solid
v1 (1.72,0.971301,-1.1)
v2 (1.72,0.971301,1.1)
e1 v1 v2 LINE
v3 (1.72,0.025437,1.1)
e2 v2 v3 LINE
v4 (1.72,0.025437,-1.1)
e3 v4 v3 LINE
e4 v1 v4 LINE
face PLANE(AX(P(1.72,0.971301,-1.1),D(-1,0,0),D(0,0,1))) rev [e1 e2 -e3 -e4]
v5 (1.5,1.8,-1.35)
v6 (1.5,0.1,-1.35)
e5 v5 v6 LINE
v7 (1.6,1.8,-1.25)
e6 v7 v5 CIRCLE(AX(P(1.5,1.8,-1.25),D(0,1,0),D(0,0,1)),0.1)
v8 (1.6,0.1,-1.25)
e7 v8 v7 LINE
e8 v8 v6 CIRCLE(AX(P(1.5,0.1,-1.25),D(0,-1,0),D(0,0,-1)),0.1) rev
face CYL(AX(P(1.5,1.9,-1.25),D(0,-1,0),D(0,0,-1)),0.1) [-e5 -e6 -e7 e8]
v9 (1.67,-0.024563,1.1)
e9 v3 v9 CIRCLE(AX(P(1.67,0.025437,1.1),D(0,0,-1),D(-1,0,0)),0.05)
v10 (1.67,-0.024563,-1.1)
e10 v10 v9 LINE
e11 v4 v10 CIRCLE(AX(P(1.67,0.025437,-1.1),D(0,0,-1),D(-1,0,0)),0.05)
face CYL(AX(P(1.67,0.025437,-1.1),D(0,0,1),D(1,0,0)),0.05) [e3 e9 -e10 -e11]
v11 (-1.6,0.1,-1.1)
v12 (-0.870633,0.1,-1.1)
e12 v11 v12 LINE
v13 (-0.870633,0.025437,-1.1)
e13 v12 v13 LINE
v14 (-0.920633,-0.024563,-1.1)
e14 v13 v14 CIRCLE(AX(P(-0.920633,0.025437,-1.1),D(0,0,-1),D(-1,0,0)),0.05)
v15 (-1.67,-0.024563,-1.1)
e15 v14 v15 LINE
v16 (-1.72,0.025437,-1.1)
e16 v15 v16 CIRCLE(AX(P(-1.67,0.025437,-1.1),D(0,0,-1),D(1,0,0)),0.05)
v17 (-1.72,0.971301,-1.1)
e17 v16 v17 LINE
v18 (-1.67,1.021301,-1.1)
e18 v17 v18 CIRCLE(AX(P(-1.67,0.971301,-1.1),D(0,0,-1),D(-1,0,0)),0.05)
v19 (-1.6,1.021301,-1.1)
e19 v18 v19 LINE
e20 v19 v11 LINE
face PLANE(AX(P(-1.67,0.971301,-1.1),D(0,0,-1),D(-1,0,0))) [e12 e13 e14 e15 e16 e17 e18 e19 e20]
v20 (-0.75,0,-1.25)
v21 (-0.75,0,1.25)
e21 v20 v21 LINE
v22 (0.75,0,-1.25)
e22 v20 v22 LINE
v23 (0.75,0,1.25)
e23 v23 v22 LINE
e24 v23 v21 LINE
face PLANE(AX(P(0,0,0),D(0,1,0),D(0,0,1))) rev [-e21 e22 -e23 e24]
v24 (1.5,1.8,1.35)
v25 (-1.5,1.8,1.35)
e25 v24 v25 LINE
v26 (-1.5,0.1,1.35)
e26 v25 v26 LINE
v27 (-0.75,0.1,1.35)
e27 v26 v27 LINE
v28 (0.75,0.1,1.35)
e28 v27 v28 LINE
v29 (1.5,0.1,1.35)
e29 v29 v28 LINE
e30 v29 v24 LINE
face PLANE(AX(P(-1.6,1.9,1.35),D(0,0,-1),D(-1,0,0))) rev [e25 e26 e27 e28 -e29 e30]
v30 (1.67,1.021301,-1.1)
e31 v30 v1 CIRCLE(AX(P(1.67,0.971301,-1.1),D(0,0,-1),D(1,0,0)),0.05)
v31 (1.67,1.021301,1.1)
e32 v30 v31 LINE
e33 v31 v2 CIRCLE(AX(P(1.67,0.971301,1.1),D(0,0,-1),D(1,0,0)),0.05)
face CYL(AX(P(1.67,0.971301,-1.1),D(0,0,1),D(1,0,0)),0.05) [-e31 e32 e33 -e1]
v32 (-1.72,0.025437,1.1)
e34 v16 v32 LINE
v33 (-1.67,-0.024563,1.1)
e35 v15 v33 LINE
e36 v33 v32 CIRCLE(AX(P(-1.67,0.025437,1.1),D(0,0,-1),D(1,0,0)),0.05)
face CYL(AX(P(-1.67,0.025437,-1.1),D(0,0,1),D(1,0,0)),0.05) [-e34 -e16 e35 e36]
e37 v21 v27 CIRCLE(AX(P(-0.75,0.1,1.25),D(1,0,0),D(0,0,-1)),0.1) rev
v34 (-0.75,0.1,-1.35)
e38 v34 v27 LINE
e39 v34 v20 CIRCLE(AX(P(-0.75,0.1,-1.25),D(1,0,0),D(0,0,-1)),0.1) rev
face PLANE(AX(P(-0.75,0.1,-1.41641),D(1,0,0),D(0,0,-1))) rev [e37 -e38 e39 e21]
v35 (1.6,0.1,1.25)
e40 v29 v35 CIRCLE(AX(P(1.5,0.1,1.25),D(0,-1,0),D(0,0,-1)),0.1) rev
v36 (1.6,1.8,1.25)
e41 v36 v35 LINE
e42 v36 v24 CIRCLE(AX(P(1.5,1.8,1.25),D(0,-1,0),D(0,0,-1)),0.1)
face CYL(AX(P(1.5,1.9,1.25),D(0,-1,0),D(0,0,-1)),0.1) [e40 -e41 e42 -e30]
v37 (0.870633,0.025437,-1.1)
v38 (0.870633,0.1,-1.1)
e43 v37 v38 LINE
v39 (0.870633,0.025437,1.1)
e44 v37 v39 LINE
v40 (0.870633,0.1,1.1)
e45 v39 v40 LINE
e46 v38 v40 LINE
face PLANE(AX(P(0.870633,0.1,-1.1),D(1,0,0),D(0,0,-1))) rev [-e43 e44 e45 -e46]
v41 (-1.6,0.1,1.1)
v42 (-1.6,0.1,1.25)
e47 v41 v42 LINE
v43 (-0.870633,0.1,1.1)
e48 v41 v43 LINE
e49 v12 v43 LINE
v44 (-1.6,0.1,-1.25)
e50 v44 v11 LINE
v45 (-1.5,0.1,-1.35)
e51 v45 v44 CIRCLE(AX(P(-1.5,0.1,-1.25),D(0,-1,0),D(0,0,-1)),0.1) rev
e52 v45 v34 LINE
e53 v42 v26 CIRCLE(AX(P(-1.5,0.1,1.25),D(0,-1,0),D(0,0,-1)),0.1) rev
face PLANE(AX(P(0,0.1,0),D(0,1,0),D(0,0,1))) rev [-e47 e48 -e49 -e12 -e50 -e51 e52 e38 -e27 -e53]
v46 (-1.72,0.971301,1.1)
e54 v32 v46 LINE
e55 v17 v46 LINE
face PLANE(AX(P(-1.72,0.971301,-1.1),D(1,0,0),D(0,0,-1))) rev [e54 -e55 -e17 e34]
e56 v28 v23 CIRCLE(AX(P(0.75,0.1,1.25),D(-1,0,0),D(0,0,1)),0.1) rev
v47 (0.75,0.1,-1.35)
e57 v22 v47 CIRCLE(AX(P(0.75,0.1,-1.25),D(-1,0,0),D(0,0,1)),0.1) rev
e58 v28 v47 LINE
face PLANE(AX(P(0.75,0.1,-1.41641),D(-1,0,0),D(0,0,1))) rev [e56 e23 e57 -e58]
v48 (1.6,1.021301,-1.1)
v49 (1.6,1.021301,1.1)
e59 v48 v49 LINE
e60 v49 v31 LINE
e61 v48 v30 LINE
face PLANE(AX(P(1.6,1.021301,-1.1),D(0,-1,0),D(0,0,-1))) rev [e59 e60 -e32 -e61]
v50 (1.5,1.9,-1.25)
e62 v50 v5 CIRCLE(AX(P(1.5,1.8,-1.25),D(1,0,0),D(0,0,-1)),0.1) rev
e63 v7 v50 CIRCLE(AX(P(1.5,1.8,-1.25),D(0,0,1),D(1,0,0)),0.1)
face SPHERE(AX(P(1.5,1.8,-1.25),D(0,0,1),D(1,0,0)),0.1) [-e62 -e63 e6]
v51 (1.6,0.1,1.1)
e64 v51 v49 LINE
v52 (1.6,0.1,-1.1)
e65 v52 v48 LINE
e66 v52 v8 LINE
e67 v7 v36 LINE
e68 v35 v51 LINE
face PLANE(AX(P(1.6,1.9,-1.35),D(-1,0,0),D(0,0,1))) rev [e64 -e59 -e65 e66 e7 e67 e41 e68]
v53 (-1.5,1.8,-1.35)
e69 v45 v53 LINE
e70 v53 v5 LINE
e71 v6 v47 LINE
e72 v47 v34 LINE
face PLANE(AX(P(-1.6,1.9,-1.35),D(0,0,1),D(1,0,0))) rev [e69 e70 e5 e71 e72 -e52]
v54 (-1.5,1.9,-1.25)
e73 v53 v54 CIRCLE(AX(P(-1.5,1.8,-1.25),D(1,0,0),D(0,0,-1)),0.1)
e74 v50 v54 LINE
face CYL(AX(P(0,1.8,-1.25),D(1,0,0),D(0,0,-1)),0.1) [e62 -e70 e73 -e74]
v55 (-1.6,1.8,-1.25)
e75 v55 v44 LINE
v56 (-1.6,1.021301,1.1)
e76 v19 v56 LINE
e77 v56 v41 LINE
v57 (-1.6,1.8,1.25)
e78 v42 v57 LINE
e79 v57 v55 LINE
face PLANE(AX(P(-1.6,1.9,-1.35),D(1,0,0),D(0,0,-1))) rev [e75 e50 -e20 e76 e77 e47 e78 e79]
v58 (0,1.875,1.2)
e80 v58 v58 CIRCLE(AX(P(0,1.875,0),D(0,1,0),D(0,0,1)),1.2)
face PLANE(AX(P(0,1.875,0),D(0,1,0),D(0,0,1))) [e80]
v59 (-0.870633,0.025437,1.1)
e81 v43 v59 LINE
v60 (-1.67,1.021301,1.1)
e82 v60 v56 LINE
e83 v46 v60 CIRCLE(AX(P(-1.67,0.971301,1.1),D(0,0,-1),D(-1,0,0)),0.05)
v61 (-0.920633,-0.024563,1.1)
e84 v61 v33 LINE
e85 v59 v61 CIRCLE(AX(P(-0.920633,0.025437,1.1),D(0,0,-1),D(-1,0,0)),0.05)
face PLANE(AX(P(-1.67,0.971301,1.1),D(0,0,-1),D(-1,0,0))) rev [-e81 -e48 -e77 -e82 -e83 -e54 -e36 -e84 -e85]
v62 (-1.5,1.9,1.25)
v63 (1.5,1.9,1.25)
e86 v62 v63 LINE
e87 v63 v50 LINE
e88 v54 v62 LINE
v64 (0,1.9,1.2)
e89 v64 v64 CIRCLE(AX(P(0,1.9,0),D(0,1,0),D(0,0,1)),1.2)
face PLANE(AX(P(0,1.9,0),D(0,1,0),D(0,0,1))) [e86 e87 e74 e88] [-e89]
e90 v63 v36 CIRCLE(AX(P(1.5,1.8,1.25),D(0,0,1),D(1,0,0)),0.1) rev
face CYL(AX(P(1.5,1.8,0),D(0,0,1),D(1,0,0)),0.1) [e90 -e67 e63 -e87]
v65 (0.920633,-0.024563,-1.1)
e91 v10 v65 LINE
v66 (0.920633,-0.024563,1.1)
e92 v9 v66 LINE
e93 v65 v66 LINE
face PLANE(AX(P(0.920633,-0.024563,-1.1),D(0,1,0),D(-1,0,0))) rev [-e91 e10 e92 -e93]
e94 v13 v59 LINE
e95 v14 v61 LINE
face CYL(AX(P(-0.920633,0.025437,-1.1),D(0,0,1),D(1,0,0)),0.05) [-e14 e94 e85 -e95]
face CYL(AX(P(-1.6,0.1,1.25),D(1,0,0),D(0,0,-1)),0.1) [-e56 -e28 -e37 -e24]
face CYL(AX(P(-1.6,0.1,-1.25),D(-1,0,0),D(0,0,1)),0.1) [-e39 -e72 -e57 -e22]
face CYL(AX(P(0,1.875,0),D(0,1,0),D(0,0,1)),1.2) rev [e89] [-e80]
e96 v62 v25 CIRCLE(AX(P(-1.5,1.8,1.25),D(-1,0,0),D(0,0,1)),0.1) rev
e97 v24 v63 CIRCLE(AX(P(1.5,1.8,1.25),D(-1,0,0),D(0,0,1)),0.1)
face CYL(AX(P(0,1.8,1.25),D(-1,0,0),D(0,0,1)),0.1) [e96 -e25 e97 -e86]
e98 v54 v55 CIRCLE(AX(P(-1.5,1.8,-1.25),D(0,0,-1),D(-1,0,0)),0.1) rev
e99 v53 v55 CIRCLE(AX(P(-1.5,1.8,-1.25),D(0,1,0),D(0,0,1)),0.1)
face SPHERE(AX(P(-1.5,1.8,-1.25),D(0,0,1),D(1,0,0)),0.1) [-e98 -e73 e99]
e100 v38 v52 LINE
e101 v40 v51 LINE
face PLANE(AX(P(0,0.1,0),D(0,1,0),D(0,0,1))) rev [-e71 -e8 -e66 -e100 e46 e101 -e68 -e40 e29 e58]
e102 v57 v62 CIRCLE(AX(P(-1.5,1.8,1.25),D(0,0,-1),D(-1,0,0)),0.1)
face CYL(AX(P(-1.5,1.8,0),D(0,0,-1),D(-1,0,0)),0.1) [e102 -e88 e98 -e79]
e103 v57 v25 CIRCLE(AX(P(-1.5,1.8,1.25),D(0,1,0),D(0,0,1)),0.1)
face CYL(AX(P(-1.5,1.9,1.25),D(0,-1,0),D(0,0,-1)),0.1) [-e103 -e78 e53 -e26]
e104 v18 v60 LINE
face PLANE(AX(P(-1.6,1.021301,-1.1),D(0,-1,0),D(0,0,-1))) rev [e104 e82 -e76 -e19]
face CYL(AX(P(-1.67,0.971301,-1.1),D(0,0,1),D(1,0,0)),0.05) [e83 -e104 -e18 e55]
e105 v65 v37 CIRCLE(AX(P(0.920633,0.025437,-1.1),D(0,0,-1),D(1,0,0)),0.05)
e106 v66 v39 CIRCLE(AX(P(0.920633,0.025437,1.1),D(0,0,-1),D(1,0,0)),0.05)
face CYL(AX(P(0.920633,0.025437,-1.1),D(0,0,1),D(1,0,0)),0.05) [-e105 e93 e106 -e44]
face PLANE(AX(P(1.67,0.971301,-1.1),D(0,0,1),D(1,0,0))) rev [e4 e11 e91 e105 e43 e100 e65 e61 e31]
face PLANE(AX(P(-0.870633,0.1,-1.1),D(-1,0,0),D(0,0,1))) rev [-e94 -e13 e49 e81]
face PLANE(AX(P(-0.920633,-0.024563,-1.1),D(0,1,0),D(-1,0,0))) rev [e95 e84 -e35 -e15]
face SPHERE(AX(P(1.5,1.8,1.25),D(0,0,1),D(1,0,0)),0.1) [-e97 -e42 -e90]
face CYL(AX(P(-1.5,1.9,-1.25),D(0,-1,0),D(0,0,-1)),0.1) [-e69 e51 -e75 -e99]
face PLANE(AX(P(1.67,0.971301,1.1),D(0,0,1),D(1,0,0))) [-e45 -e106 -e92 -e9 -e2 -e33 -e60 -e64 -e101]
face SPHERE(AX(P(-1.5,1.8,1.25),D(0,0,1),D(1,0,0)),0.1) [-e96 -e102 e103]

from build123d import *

# Parameters (mm, degrees)
SKETCH_2_W          = 3.2
SKETCH_2_H          = 2.7
EXTRUDE_1_DEPTH     = 1.9
FILLET_1_R          = 0.1
FILLET_2_R          = 0.1
FILLET_3_R          = 0.1
FILLET_4_R          = 0.1
FILLET_5_R          = 0.1
SKETCH_3_R          = 1.2
CUT_EXTRUDE_1_DEPTH = 0.025
SKETCH_4_W          = 0.92775498
SKETCH_4_H          = 2.835918068
CUT_EXTRUDE_2_DEPTH = 0.1
EXTRUDE_3_DEPTH     = 1.1


with BuildPart() as part:
    # Эскиз2 → Бобышка-Вытянуть1 (new body)
    with BuildSketch(Plane(origin=(0, 0, 0), x_dir=(1, 0, 0), z_dir=(0, 1, 0))):
        Rectangle(SKETCH_2_W, SKETCH_2_H)
    extrude(amount=EXTRUDE_1_DEPTH)

    # Скругление1
    fillet_1_edges = [part.edges().sort_by_distance(p)[0] for p in [
        (-1.6, 1.9, 0),
        (0, 1.9, 1.35),
        (1.6, 1.9, 0),
        (0, 1.9, -1.35),
    ]]
    fillet(fillet_1_edges, radius=FILLET_1_R)

    # Скругление2
    # the kernel refuses this fillet: 0.1 mm, written as the material it takes off along each edge
    with BuildSketch(Plane(origin=(-1.5, 1.8, 1.25), x_dir=(0, 0, 1), z_dir=(-1, 0, 0))) as fillet_2_piece_1_section:
        Polygon((0, 0), (FILLET_2_R, 0), (FILLET_2_R, FILLET_2_R), (0, FILLET_2_R), align=None)
    fillet_2_piece_1 = extrude(amount=FILLET_2_R, mode=Mode.PRIVATE)
    fillet_2_piece_1 = fillet_2_piece_1 - Plane(origin=(-1.5, 1.8, 1.25), x_dir=(0, -0.7071067811865475, -0.7071067811865475), z_dir=(-1, 0, 0)) * Sphere(FILLET_2_R, mode=Mode.PRIVATE)
    add(fillet_2_piece_1, mode=Mode.SUBTRACT)
    with BuildSketch(Plane(origin=(1.5, 1.8, 1.25), x_dir=(0, 0, 1), z_dir=(1, 0, 0))) as fillet_2_piece_2_section:
        Polygon((0, 0), (FILLET_2_R, 0), (FILLET_2_R, -FILLET_2_R), (0, -FILLET_2_R), align=None)
    fillet_2_piece_2 = extrude(amount=FILLET_2_R, mode=Mode.PRIVATE)
    fillet_2_piece_2 = fillet_2_piece_2 - Plane(origin=(1.5, 1.8, 1.25), x_dir=(0, -0.7071067811865475, -0.7071067811865475), z_dir=(1, 0, 0)) * Sphere(FILLET_2_R, mode=Mode.PRIVATE)
    add(fillet_2_piece_2, mode=Mode.SUBTRACT)
    with BuildSketch(Plane(origin=(1.6, -0.25, 1.35), x_dir=(0, 0, -1), z_dir=(0, 1, 0))) as fillet_2_piece_3:
        with BuildLine():
            CenterArc((FILLET_2_R, FILLET_2_R), FILLET_2_R, 180, 90)
            Line((0, FILLET_2_R), (0, 0))
            Line((0, 0), (FILLET_2_R, 0))
        make_face()
    extrude(amount=2.05, mode=Mode.SUBTRACT)
    with BuildSketch(Plane(origin=(-1.6, -0.25, 1.35), x_dir=(0, 0, -1), z_dir=(0, 1, 0))) as fillet_2_piece_4:
        with BuildLine():
            CenterArc((FILLET_2_R, -FILLET_2_R), FILLET_2_R, 90, 90)
            Line((0, -FILLET_2_R), (0, 0))
            Line((0, 0), (FILLET_2_R, 0))
        make_face()
    extrude(amount=2.05, mode=Mode.SUBTRACT)
    with BuildSketch(Plane(origin=(1.85, 0, 1.35), x_dir=(0, 0, -1), z_dir=(-1, 0, 0))) as fillet_2_piece_5:
        with BuildLine():
            CenterArc((FILLET_2_R, -FILLET_2_R), FILLET_2_R, 90, 90)
            Line((0, -FILLET_2_R), (0, 0))
            Line((0, 0), (FILLET_2_R, 0))
        make_face()
    extrude(amount=3.7, mode=Mode.SUBTRACT)

    # Скругление3
    # the kernel refuses this fillet: 0.1 mm, written as the material it takes off along each edge
    with BuildSketch(Plane(origin=(1.5, 1.8, -1.25), x_dir=(1, 0, 0), z_dir=(0, 0, -1))) as fillet_3_piece_1_section:
        Polygon((0, 0), (FILLET_3_R, 0), (FILLET_3_R, -FILLET_3_R), (0, -FILLET_3_R), align=None)
    fillet_3_piece_1 = extrude(amount=FILLET_3_R, mode=Mode.PRIVATE)
    fillet_3_piece_1 = fillet_3_piece_1 - Plane(origin=(1.5, 1.8, -1.25), x_dir=(-0.7071067811865475, -0.7071067811865475, 0), z_dir=(0, 0, -1)) * Sphere(FILLET_3_R, mode=Mode.PRIVATE)
    add(fillet_3_piece_1, mode=Mode.SUBTRACT)
    with BuildSketch(Plane(origin=(1.5, 0.1, 1.25), x_dir=(1, 0, 0), z_dir=(0, -1, 0))) as fillet_3_piece_2_section:
        Polygon((0, 0), (FILLET_3_R, 0), (FILLET_3_R, FILLET_3_R), (0, FILLET_3_R), align=None)
    fillet_3_piece_2 = extrude(amount=FILLET_3_R, mode=Mode.PRIVATE)
    fillet_3_piece_2 = fillet_3_piece_2 - Plane(origin=(1.5, 0.1, 1.25), x_dir=(-0.7071067811865476, 0, -0.7071067811865475), z_dir=(0, -1, 0)) * Sphere(FILLET_3_R, mode=Mode.PRIVATE)
    add(fillet_3_piece_2, mode=Mode.SUBTRACT)
    with BuildSketch(Plane(origin=(1.6, -0.25, -1.35), x_dir=(-1, 0, 0), z_dir=(0, 1, 0))) as fillet_3_piece_3:
        with BuildLine():
            CenterArc((FILLET_3_R, FILLET_3_R), FILLET_3_R, 180, 90)
            Line((0, FILLET_3_R), (0, 0))
            Line((0, 0), (FILLET_3_R, 0))
        make_face()
    extrude(amount=2.05, mode=Mode.SUBTRACT)
    with BuildSketch(Plane(origin=(1.6, 0, -1.6), x_dir=(-1, 0, 0), z_dir=(0, 0, 1))) as fillet_3_piece_4:
        with BuildLine():
            CenterArc((FILLET_3_R, -FILLET_3_R), FILLET_3_R, 90, 90)
            Line((0, -FILLET_3_R), (0, 0))
            Line((0, 0), (FILLET_3_R, 0))
        make_face()
    extrude(amount=2.85, mode=Mode.SUBTRACT)

    # Скругление4
    # the kernel refuses this fillet: 0.1 mm, written as the material it takes off along each edge
    with BuildSketch(Plane(origin=(-1.5, 1.8, -1.25), x_dir=(-1, 0, 0), z_dir=(0, 0, -1))) as fillet_4_piece_1_section:
        Polygon((0, 0), (FILLET_4_R, 0), (FILLET_4_R, FILLET_4_R), (0, FILLET_4_R), align=None)
    fillet_4_piece_1 = extrude(amount=FILLET_4_R, mode=Mode.PRIVATE)
    fillet_4_piece_1 = fillet_4_piece_1 - Plane(origin=(-1.5, 1.8, -1.25), x_dir=(0.7071067811865475, -0.7071067811865475, 0), z_dir=(0, 0, -1)) * Sphere(FILLET_4_R, mode=Mode.PRIVATE)
    add(fillet_4_piece_1, mode=Mode.SUBTRACT)
    with BuildSketch(Plane(origin=(1.5, 0.1, -1.25), x_dir=(0, -1, 0), z_dir=(0, 0, -1))) as fillet_4_piece_2_section:
        Polygon((0, 0), (FILLET_4_R, 0), (FILLET_4_R, -FILLET_4_R), (0, -FILLET_4_R), align=None)
    fillet_4_piece_2 = extrude(amount=FILLET_4_R, mode=Mode.PRIVATE)
    fillet_4_piece_2 = fillet_4_piece_2 - Plane(origin=(1.5, 0.1, -1.25), x_dir=(-0.7071067811865475, 0.7071067811865475, 0), z_dir=(0, 0, -1)) * Sphere(FILLET_4_R, mode=Mode.PRIVATE)
    add(fillet_4_piece_2, mode=Mode.SUBTRACT)
    with BuildSketch(Plane(origin=(-1.6, -0.25, -1.35), x_dir=(1, 0, 0), z_dir=(0, 1, 0))) as fillet_4_piece_3:
        with BuildLine():
            CenterArc((FILLET_4_R, -FILLET_4_R), FILLET_4_R, 90, 90)
            Line((0, -FILLET_4_R), (0, 0))
            Line((0, 0), (FILLET_4_R, 0))
        make_face()
    extrude(amount=2.05, mode=Mode.SUBTRACT)
    with BuildSketch(Plane(origin=(-1.85, 0, -1.35), x_dir=(0, 1, 0), z_dir=(1, 0, 0))) as fillet_4_piece_4:
        with BuildLine():
            CenterArc((FILLET_4_R, FILLET_4_R), FILLET_4_R, 180, 90)
            Line((0, FILLET_4_R), (0, 0))
            Line((0, 0), (FILLET_4_R, 0))
        make_face()
    extrude(amount=3.35, mode=Mode.SUBTRACT)

    # Скругление5
    # the kernel refuses this fillet: 0.1 mm, written as the material it takes off along each edge
    with BuildSketch(Plane(origin=(-1.5, 0.1, 1.25), x_dir=(-1, 0, 0), z_dir=(0, -1, 0))) as fillet_5_piece_1_section:
        Polygon((0, 0), (FILLET_5_R, 0), (FILLET_5_R, -FILLET_5_R), (0, -FILLET_5_R), align=None)
    fillet_5_piece_1 = extrude(amount=FILLET_5_R, mode=Mode.PRIVATE)
    fillet_5_piece_1 = fillet_5_piece_1 - Plane(origin=(-1.5, 0.1, 1.25), x_dir=(0.7071067811865475, 0, -0.7071067811865477), z_dir=(0, -1, 0)) * Sphere(FILLET_5_R, mode=Mode.PRIVATE)
    add(fillet_5_piece_1, mode=Mode.SUBTRACT)
    with BuildSketch(Plane(origin=(-1.5, 0.1, -1.25), x_dir=(-1, 0, 0), z_dir=(0, -1, 0))) as fillet_5_piece_2_section:
        Polygon((0, 0), (FILLET_5_R, 0), (FILLET_5_R, FILLET_5_R), (0, FILLET_5_R), align=None)
    fillet_5_piece_2 = extrude(amount=FILLET_5_R, mode=Mode.PRIVATE)
    fillet_5_piece_2 = fillet_5_piece_2 - Plane(origin=(-1.5, 0.1, -1.25), x_dir=(0.7071067811865476, 0, 0.7071067811865475), z_dir=(0, -1, 0)) * Sphere(FILLET_5_R, mode=Mode.PRIVATE)
    add(fillet_5_piece_2, mode=Mode.SUBTRACT)
    with BuildSketch(Plane(origin=(-1.6, 0, 1.25), x_dir=(1, 0, 0), z_dir=(0, 0, -1))) as fillet_5_piece_3:
        with BuildLine():
            CenterArc((FILLET_5_R, -FILLET_5_R), FILLET_5_R, 90, 90)
            Line((0, -FILLET_5_R), (0, 0))
            Line((0, 0), (FILLET_5_R, 0))
        make_face()
    extrude(amount=2.5, mode=Mode.SUBTRACT)

    # Эскиз3 → Вырез-Вытянуть1 (cut)
    with BuildSketch(Plane(origin=(0, 1.9, 0), x_dir=(1, 0, 0), z_dir=(0, 1, 0))):
        with Locations(Location((0, 0, 0), (0, 0, 270))):
            Circle(SKETCH_3_R)
    extrude(amount=-CUT_EXTRUDE_1_DEPTH, mode=Mode.SUBTRACT)

    # Эскиз4 → Вырез-Вытянуть2 (cut)
    with BuildSketch(Plane.XZ):
        with Locations((1.213877491, 0.001548995)):
            Rectangle(SKETCH_4_W, SKETCH_4_H)
        with Locations((-1.213877491, 0.001548995)):
            Rectangle(SKETCH_4_W, SKETCH_4_H)
    extrude(amount=-CUT_EXTRUDE_2_DEPTH, mode=Mode.SUBTRACT)

    # Эскиз6 → Бобышка-Вытянуть3 (add, symmetric)
    with BuildSketch(Plane(origin=(0, 0, 0), x_dir=(-1, 0, 0), z_dir=(0, 0, -1))):
        with BuildLine():
            Line((1.6, 0.1), (0.87063337, 0.1))
            Line((0.87063337, 0.1), (0.87063337, 0.025437095))
            ThreePointArc((0.87063337, 0.025437095), (0.885278031, -0.009918244), (0.92063337, -0.024562905))
            Line((0.92063337, -0.024562905), (1.67, -0.024562905))
            ThreePointArc((1.67, -0.024562905), (1.705355339, -0.009918244), (1.72, 0.025437095))
            Line((1.72, 0.025437095), (1.72, 0.971300934))
            ThreePointArc((1.72, 0.971300934), (1.705355339, 1.006656273), (1.67, 1.021300934))
            Line((1.67, 1.021300934), (1.6, 1.021300934))
            Line((1.6, 1.021300934), (1.6, 0.1))
        make_face()
        with BuildLine():
            Line((-1.6, 1.021300934), (-1.67, 1.021300934))
            ThreePointArc((-1.67, 1.021300934), (-1.705355339, 1.006656273), (-1.72, 0.971300934))
            Line((-1.72, 0.971300934), (-1.72, 0.025437095))
            ThreePointArc((-1.72, 0.025437095), (-1.705355339, -0.009918244), (-1.67, -0.024562905))
            Line((-1.67, -0.024562905), (-0.92063337, -0.024562905))
            ThreePointArc((-0.92063337, -0.024562905), (-0.885278031, -0.009918244), (-0.87063337, 0.025437095))
            Line((-0.87063337, 0.025437095), (-0.87063337, 0.1))
            Line((-0.87063337, 0.1), (-1.6, 0.1))
            Line((-1.6, 0.1), (-1.6, 1.021300934))
        make_face()
    extrude(amount=EXTRUDE_3_DEPTH, both=True)


solid = part.part
